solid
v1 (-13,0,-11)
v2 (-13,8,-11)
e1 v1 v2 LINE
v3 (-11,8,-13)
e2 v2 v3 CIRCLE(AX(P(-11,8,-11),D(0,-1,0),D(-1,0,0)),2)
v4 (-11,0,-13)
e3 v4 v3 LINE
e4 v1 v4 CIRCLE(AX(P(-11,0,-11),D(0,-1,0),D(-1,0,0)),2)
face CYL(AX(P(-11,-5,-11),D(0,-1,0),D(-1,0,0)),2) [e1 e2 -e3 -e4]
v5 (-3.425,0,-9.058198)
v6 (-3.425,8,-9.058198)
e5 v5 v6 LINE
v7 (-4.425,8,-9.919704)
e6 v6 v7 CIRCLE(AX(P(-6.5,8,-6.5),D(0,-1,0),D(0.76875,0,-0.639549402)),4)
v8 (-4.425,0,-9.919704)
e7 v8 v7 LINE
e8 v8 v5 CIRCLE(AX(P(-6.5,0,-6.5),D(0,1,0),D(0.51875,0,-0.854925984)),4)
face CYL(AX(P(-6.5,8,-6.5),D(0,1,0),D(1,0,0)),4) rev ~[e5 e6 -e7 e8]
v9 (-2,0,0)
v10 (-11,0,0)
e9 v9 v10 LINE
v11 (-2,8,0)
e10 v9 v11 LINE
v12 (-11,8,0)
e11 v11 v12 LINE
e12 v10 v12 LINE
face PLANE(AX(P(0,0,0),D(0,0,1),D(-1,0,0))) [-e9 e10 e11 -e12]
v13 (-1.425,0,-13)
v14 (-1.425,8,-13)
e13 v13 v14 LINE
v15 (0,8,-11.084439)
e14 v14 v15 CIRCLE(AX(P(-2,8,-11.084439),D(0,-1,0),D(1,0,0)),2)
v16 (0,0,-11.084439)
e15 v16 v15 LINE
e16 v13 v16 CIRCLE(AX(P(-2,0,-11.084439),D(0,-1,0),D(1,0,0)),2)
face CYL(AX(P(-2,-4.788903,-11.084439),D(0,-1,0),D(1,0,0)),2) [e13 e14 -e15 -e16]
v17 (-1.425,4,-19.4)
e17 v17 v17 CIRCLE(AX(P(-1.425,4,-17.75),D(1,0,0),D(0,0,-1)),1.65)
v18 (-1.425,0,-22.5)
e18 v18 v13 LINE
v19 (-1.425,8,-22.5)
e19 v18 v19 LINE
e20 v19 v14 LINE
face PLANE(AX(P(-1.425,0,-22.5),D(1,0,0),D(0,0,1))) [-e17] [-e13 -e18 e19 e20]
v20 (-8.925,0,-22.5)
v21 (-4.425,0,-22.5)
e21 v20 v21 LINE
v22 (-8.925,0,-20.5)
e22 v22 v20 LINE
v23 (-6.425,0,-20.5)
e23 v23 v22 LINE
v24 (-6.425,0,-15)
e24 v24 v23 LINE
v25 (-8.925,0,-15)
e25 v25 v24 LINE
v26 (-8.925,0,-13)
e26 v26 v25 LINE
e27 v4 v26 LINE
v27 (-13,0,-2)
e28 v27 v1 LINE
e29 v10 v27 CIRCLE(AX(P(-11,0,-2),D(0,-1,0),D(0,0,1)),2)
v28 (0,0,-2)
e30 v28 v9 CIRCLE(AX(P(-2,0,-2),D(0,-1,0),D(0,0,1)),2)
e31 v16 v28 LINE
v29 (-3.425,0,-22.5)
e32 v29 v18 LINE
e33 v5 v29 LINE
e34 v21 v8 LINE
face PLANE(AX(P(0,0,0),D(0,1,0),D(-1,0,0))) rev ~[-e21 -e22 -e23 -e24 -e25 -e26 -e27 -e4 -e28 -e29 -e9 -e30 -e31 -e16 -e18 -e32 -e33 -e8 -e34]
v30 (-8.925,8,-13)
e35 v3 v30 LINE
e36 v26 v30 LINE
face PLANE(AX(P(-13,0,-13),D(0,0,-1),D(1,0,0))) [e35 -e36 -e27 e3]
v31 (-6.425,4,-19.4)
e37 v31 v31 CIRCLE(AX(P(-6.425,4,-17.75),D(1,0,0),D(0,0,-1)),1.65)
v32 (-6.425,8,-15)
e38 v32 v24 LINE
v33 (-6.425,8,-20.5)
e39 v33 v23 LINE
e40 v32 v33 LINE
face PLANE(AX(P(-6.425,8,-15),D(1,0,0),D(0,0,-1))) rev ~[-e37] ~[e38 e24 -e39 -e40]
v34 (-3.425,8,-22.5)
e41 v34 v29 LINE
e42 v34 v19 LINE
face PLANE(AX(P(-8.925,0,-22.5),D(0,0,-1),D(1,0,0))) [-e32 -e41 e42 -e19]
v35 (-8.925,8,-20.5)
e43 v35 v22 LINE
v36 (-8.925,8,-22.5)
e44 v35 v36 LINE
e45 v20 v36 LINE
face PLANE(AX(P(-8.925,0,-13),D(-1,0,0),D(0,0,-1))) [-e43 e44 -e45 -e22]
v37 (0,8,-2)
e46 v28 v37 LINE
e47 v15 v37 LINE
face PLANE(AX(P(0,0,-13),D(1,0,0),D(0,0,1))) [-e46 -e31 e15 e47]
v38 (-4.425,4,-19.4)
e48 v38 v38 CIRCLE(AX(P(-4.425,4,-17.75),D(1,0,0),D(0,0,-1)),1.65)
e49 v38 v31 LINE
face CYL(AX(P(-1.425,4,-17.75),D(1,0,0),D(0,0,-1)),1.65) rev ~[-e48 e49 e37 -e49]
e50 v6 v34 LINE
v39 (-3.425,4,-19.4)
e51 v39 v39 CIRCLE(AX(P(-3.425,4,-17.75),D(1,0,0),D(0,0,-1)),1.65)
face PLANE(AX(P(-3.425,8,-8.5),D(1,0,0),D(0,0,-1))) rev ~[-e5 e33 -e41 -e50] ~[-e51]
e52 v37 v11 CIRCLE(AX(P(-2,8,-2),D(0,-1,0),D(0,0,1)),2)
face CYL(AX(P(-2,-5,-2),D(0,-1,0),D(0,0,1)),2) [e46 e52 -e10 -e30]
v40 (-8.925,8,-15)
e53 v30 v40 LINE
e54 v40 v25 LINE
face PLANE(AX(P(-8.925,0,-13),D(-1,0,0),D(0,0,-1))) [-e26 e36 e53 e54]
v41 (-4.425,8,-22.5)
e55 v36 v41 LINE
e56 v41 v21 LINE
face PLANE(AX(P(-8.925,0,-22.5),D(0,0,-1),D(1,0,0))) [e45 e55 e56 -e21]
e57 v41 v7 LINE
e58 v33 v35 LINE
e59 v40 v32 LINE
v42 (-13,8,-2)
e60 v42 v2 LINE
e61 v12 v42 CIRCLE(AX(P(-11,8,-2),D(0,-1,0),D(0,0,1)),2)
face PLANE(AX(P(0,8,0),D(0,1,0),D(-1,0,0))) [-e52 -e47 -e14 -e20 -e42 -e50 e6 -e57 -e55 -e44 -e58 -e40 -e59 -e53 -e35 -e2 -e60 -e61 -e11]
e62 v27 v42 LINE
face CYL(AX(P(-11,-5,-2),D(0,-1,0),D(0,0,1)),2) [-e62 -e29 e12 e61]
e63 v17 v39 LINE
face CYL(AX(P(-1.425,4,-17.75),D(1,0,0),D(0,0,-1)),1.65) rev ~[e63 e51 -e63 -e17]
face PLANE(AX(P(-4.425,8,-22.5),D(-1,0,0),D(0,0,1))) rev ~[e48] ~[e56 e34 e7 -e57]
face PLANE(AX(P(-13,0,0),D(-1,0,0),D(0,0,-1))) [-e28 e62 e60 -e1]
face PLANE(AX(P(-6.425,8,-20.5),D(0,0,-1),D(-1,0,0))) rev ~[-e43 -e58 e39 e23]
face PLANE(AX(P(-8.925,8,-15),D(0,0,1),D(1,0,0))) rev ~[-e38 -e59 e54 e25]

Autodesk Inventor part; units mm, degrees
ref_plane "YZ Plane" through (0, 0, 0) normal (1, 0, 0) x (0, 1, 0)
ref_plane "XZ Plane" through (0, 0, 0) normal (0, 1, 0) x (-1, 0, 0)
ref_plane "XY Plane" through (0, 0, 0) normal (0, 0, 1) x (1, 0, 0)
sketch "Sketch4" plane through (0, 0, 0) normal (0, 1, 0) x (-1, 0, 0)
  line L0 (0, 0) -> (13, 0)
  line L1 (13, 0) -> (13, -13)
  line L2 (13, -13) -> (8.925, -13)
  line L3 (8.925, -13) -> (8.925, -22.5)
  line L4 (8.925, -22.5) -> (1.425, -22.5)
  line L5 (1.425, -22.5) -> (1.425, -13)
  line L6 (1.425, -13) -> (0, -13)
  line L7 (0, -13) -> (0, 0)
  dimension "d17" = 13
  dimension "d18" = 13
  dimension "d19" = 7.5
  dimension "d20" = 1.425
  dimension "d21" = 9.5
extrude "Extrusion2" add sketch "Sketch4" along normal blind 8
sketch "Sketch5" plane through (0, 8, 0) normal (0, 1, 0) x (1, 0, 0)
  line L0 (-8.925, 15) -> (-6.425, 15)
  line L1 (-6.425, 15) -> (-6.425, 20.5)
  line L2 (-6.425, 20.5) -> (-8.925, 20.5)
  line L3 (-8.925, 20.5) -> (-8.925, 15)
  line L4 (-1.425, 22.5) -> (-8.925, 22.5) projected
  line L5 (-8.925, 22.5) -> (-8.925, 13) projected
  point P0 (0, 0)
  dimension "d24" = 5.5
  dimension "d25" = 2.5
  dimension "d26" = 2
extrude "Extrusion3" cut sketch "Sketch5" against normal through all
sketch "Sketch6" plane through (0, 8, 0) normal (0, 1, 0) x (1, 0, 0)
  circle A0 centre (-6.5, 6.5) radius 4
  line L0 (-13, 0) -> (0, 0) projected
  line L1 (0, 0) -> (0, 13) projected
  dimension "d29" = 8
  dimension "d30" = 6.5
  dimension "d31" = 6.5
extrude "Extrusion4" cut sketch "Sketch6" against normal through all
sketch "Sketch7" plane through (0, 8, 0) normal (0, 1, 0) x (1, 0, 0)
  line L0 (-4.425, 8.5) -> (-3.425, 8.5)
  line L1 (-3.425, 8.5) -> (-3.425, 22.5)
  line L2 (-3.425, 22.5) -> (-4.425, 22.5)
  line L3 (-4.425, 22.5) -> (-4.425, 8.5)
  line L4 (-1.425, 22.5) -> (-8.925, 22.5) projected
  line L5 (-1.425, 13) -> (-1.425, 22.5) projected
  point P0 (0, 0)
  dimension "d34" = 1
  dimension "d35" = 14
  dimension "d36" = 2
extrude "Extrusion5" cut sketch "Sketch7" against normal through all
sketch "Sketch8" plane through (-1.425, 0, -13) normal (1, 0, 0) x (0, 0, -1)
  circle A0 centre (4.75, 4) radius 1.65
  line L0 (0, 0) -> (9.5, 0) projected
  line L1 (9.5, 0) -> (9.5, 8) projected
  point P0 (-13, 0)
  dimension "d39" = 3.3
  dimension "d40" = 4
  dimension "d41" = 4.75
extrude "Extrusion6" cut sketch "Sketch8" against normal through all
fillet "Fillet1" radius 2 4 edges at (-13, 4, -13) (-13, 4, 0) (0, 4, 0) (0, 4, -13)
properties part number "COLLIER"
